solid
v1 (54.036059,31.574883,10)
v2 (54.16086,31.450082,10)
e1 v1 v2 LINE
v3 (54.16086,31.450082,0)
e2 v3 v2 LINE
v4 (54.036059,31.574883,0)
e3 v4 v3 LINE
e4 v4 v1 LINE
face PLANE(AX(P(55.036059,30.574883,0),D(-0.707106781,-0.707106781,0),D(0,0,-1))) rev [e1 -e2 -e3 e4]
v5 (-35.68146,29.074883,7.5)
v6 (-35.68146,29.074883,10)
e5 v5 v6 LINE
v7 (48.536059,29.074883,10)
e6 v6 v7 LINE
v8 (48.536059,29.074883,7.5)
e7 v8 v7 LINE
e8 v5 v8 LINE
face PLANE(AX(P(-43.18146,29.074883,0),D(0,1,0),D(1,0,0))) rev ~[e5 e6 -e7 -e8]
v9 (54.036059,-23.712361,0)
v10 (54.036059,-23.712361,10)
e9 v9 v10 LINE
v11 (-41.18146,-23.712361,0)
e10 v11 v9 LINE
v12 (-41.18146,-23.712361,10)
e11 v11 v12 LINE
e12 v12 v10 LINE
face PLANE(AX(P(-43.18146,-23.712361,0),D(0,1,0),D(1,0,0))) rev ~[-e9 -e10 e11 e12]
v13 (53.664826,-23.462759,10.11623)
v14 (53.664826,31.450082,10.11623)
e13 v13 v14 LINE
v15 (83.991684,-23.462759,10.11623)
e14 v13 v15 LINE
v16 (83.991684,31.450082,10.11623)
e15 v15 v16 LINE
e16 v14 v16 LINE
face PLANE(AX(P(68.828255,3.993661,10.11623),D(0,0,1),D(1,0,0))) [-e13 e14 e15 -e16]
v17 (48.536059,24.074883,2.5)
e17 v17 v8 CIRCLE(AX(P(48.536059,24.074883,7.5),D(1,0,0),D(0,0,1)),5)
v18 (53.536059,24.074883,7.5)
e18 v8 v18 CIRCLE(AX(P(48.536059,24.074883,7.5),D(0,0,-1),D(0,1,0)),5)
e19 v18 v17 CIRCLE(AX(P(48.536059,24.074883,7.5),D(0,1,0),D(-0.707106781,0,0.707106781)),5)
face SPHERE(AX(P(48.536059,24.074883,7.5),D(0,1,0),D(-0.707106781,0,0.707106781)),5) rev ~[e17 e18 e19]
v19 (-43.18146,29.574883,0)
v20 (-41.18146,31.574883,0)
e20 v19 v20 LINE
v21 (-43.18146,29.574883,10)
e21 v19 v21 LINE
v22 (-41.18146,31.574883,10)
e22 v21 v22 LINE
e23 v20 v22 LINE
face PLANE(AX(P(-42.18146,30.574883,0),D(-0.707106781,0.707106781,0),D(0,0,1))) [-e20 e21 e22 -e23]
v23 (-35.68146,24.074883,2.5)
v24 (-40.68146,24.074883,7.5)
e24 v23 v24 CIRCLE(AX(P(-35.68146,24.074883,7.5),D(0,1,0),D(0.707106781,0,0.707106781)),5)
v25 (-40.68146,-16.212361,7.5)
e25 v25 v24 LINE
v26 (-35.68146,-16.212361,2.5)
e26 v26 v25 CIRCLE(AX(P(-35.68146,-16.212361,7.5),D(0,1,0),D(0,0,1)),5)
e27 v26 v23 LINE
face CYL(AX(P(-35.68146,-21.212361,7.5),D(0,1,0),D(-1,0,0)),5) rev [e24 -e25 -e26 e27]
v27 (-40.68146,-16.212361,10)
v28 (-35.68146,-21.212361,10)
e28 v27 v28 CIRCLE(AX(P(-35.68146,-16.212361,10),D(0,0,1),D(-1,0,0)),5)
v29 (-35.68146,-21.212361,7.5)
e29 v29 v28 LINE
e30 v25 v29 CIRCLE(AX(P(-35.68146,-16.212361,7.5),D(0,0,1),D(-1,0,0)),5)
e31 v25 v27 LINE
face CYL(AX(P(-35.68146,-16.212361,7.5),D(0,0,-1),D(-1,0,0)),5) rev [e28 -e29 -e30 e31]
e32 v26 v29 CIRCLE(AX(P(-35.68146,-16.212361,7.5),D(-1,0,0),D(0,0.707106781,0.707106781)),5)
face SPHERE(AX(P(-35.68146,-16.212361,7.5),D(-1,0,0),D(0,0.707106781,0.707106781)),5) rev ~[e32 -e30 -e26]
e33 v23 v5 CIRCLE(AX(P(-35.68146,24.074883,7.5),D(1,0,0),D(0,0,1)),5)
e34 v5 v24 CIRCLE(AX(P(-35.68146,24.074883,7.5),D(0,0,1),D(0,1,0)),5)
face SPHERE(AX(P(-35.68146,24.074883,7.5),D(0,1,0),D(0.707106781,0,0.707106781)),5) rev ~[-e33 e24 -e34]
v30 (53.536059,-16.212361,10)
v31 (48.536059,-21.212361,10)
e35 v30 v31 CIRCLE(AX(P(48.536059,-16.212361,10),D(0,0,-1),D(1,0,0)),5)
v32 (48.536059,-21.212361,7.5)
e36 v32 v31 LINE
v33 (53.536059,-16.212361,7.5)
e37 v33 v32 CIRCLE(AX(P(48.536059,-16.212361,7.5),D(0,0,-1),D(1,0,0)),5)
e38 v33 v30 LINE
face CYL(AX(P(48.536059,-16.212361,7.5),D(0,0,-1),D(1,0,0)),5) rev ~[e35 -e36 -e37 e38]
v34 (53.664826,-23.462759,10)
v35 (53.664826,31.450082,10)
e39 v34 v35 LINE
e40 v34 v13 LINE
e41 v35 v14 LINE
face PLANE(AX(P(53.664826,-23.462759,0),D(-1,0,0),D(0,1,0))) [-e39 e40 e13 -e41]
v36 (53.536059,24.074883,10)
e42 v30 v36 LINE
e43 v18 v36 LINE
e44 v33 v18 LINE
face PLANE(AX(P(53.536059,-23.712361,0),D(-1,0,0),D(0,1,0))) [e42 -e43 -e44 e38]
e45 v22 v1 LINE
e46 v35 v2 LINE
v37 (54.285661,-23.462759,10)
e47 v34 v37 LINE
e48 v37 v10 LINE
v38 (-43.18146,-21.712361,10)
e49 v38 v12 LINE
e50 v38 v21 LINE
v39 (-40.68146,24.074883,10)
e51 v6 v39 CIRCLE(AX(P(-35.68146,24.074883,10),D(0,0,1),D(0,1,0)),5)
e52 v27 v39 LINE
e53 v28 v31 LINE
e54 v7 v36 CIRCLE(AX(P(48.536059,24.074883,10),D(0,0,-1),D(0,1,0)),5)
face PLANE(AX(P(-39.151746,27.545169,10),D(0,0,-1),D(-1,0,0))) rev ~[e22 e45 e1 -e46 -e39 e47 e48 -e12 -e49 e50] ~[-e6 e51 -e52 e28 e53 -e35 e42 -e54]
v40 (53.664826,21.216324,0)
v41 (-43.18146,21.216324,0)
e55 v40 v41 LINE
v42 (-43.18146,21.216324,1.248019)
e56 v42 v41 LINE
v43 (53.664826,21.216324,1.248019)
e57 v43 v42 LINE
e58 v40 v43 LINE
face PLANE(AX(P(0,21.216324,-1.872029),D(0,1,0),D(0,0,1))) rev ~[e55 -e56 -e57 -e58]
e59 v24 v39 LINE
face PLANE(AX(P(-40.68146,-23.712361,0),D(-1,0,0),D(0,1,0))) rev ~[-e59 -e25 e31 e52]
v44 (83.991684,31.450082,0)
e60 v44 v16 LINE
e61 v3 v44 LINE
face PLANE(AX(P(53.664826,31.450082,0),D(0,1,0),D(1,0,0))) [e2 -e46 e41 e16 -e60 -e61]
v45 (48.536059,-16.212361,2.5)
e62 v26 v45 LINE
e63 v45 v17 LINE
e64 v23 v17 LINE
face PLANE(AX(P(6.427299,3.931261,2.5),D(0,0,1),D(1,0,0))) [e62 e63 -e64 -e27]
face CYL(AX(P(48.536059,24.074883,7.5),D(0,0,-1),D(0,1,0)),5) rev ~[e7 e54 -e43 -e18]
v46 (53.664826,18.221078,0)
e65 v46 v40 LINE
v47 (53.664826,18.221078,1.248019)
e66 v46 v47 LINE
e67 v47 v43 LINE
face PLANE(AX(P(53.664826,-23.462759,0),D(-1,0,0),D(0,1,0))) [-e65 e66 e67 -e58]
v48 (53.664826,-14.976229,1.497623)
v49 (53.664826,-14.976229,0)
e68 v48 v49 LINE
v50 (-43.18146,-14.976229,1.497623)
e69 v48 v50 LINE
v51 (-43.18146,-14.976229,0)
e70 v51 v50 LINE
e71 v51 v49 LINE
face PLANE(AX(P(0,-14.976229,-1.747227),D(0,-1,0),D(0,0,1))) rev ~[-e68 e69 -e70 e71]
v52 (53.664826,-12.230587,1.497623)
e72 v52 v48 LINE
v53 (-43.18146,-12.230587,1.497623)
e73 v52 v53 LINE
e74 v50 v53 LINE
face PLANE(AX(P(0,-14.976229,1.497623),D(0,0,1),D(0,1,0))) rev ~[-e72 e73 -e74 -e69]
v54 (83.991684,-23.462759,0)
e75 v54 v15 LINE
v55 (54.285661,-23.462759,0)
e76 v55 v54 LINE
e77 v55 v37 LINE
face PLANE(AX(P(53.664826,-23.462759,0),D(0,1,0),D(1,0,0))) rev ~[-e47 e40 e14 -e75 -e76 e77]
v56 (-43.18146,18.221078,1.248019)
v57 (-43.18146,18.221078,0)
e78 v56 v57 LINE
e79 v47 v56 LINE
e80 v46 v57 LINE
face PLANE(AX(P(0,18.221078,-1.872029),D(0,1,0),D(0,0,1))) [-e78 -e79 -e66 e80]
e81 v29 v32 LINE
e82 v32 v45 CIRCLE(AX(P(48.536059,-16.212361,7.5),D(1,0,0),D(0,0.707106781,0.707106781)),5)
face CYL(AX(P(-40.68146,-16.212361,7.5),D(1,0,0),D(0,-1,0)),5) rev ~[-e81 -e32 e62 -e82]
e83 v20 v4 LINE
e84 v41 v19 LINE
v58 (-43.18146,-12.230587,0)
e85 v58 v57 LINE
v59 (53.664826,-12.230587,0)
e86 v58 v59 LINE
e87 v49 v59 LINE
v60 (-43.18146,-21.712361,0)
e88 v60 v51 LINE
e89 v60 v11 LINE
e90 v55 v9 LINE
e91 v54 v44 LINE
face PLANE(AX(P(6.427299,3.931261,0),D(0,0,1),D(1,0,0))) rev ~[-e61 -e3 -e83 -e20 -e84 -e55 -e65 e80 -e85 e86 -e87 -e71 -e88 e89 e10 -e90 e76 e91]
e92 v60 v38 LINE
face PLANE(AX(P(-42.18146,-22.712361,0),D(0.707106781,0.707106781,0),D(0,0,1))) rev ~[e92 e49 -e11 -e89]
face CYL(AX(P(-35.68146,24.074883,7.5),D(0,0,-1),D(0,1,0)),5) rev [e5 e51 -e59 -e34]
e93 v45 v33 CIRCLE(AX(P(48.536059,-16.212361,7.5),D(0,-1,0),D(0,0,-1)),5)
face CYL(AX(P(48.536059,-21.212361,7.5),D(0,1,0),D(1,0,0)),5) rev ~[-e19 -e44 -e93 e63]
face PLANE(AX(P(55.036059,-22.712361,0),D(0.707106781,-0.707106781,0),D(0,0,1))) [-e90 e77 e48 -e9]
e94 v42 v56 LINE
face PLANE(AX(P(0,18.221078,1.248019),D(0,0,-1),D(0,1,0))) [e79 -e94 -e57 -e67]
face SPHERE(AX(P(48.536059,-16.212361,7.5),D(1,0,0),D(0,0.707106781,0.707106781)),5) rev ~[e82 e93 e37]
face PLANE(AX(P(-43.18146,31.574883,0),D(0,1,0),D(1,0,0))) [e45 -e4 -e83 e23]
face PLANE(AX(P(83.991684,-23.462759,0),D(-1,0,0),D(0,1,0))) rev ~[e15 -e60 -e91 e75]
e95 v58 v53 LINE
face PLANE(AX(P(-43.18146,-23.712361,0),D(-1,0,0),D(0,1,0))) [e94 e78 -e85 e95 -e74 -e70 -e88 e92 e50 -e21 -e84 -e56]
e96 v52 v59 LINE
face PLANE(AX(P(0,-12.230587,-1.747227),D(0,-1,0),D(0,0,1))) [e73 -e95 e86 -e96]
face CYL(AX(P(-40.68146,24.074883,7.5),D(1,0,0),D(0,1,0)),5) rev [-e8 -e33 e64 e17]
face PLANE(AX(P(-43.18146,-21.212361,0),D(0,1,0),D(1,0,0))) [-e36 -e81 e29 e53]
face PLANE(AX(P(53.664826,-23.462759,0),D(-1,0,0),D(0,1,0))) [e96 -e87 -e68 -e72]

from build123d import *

# Parameters (mm, degrees)
F0_W         = 99.2175191641
F0_H         = 55.2872437984
F1_DEPTH     = 10
F2_T         = -2.5
F3_R         = 5
F4_T1_DEPTH  = 2.5
F4_S5_W      = 5
F4_S5_H      = 5
F4_T6_DEPTH  = 5
F4_S11_W     = 5
F4_S11_H     = 5
F4_T12_DEPTH = 5
F4_S17_W     = 5
F4_S17_H     = 5
F4_T18_DEPTH = 5
F4_S23_W     = 5
F4_S23_H     = 5
F4_T24_DEPTH = 5
F5_SIZE      = 2
F6_W         = 2.7456413954
F6_H         = 3.2448493876
F6_W_2       = 2.9952451587
F6_H_2       = 3.1200476224
F7_DEPTH     = 58.81103
F8_W         = 30.3268581629
F8_H         = 54.9128409475
F9_DEPTH     = 10.11623


# Not quite as in the source:
# - a fillet or chamfer that OpenCascade refuses, or shapes differently, is made with other operations: its cross-section is extruded or revolved along the edge and cut away or added
# - a feature names something its author has since deleted; it is built from what else it names


with BuildPart() as f1:
    # F0 (on Top) → F1 (new body)
    with BuildSketch(Plane.XY):
        with Locations((6.4272992313, 3.9312606677)):
            Rectangle(F0_W, F0_H)
    extrude(amount=F1_DEPTH)

    # F2
    f2_openings = [f1.faces().sort_by_distance(p)[0] for p in [
        (6.427299, 3.931261, 10),
    ]]
    offset(amount=F2_T, openings=f2_openings)

    # F3
    f3_edges = [f1.edges().sort_by_distance(p)[0] for p in [
        (6.427299, 29.074883, 2.5),
        (-40.68146, 3.931261, 2.5),
        (53.536059, 3.931261, 2.5),
        (6.427299, -21.212361, 2.5),
    ]]
    fillet(f3_edges, radius=F3_R)

    # F4: fillet of radius 5 on 4 edges, made by hand

    # F4_s2 → F4_t1 (join)
    with BuildSketch(Plane.XY.offset(7.5)):
        with BuildLine():
            ThreePointArc((-35.6814603508, 29.0748825669), (-39.2169942567, 27.6104164729), (-40.6814603508, 24.0748825669))
            Line((-40.6814603508, 24.0748825669), (-40.6814603508, 29.0748825669))
            Line((-40.6814603508, 29.0748825669), (-35.6814603508, 29.0748825669))
        make_face()
        with BuildLine():
            ThreePointArc((-40.6814603508, -16.2123612314), (-39.2169942567, -19.7478951374), (-35.6814603508, -21.2123612314))
            Line((-35.6814603508, -21.2123612314), (-40.6814603508, -21.2123612314))
            Line((-40.6814603508, -21.2123612314), (-40.6814603508, -16.2123612314))
        make_face()
        with BuildLine():
            ThreePointArc((53.5360588133, -16.2123612314), (52.0715927193, -19.7478951374), (48.5360588133, -21.2123612314))
            Line((48.5360588133, -21.2123612314), (53.5360588133, -21.2123612314))
            Line((53.5360588133, -21.2123612314), (53.5360588133, -16.2123612314))
        make_face()
        with BuildLine():
            ThreePointArc((48.5360588133, 29.0748825669), (52.0715927193, 27.6104164729), (53.5360588133, 24.0748825669))
            Line((53.5360588133, 24.0748825669), (53.5360588133, 29.0748825669))
            Line((53.5360588133, 29.0748825669), (48.5360588133, 29.0748825669))
        make_face()
    extrude(amount=F4_T1_DEPTH)


with BuildPart() as f4_tool4:
    # F4_s5 → F4_t6 (new body)
    with BuildSketch(Plane.XZ.offset(-24.0748825669)):
        with Locations((51.0360588133, 5)):
            Rectangle(F4_S5_W, F4_S5_H)
    extrude(amount=-F4_T6_DEPTH)

    # F4_s7 → F4_t8 (revolve, cut)
    with BuildSketch(Plane(origin=(48.5360588133, 24.0748825669, 7.5), x_dir=(-0.7071067812, 0, 0.7071067812), z_dir=(-0.7071067812, 0, -0.7071067812))):
        with BuildLine():
            ThreePointArc((0, -5), (5, 0), (0, 5))
            Line((0, 5), (0, -5))
        make_face()
    revolve(axis=Axis((48.5360588133, 24.0748825669, 7.5), (0, 1, 0)), mode=Mode.SUBTRACT)


with BuildPart() as f1_1:
    add(f1.part)

    # F4_t3: union F4_tool4
    add(f4_tool4.part)


with BuildPart() as f4_tool10:
    # F4_s11 → F4_t12 (new body)
    with BuildSketch(Plane.YZ.offset(48.5360588133)):
        with Locations((-18.7123612314, 5)):
            Rectangle(F4_S11_W, F4_S11_H)
    extrude(amount=F4_T12_DEPTH)

    # F4_s13 → F4_t14 (revolve, cut)
    with BuildSketch(Plane(origin=(48.5360588133, -16.2123612314, 7.5), x_dir=(0, 0.7071067812, 0.7071067812), z_dir=(0, 0.7071067812, -0.7071067812))):
        with BuildLine():
            ThreePointArc((0, -5), (5, 0), (0, 5))
            Line((0, 5), (0, -5))
        make_face()
    revolve(axis=Axis((48.5360588133, -16.2123612314, 7.5), (1, 0, 0)), mode=Mode.SUBTRACT)


with BuildPart() as f1_2:
    add(f1_1.part)

    # F4_t9: union F4_tool10
    add(f4_tool10.part)


with BuildPart() as f4_tool16:
    # F4_s17 → F4_t18 (new body)
    with BuildSketch(Plane.YZ.offset(-35.6814603508)):
        with Locations((-18.7123612314, 5)):
            Rectangle(F4_S17_W, F4_S17_H)
    extrude(amount=-F4_T18_DEPTH)

    # F4_s19 → F4_t20 (revolve, cut)
    with BuildSketch(Plane(origin=(-35.6814603508, -16.2123612314, 7.5), x_dir=(0, 0.7071067812, 0.7071067812), z_dir=(0, -0.7071067812, 0.7071067812))):
        with BuildLine():
            ThreePointArc((0, -5), (5, 0), (0, 5))
            Line((0, 5), (0, -5))
        make_face()
    revolve(axis=Axis((-35.6814603508, -16.2123612314, 7.5), (-1, 0, 0)), mode=Mode.SUBTRACT)


with BuildPart() as f1_3:
    add(f1_2.part)

    # F4_t15: union F4_tool16
    add(f4_tool16.part)


with BuildPart() as f4_tool22:
    # F4_s23 → F4_t24 (new body)
    with BuildSketch(Plane.XZ.offset(-24.0748825669)):
        with Locations((-38.1814603508, 5)):
            Rectangle(F4_S23_W, F4_S23_H)
    extrude(amount=-F4_T24_DEPTH)

    # F4_s25 → F4_t26 (revolve, cut)
    with BuildSketch(Plane(origin=(-35.6814603508, 24.0748825669, 7.5), x_dir=(0.7071067812, 0, 0.7071067812), z_dir=(-0.7071067812, 0, 0.7071067812))):
        with BuildLine():
            ThreePointArc((0, -5), (5, 0), (0, 5))
            Line((0, 5), (0, -5))
        make_face()
    revolve(axis=Axis((-35.6814603508, 24.0748825669, 7.5), (0, 1, 0)), mode=Mode.SUBTRACT)


with BuildPart() as f1_4:
    add(f1_3.part)

    # F4_t21: union F4_tool22
    add(f4_tool22.part)

    # F5
    f5_edges = [f1_4.edges().sort_by_distance(p)[0] for p in [
        (56.036059, -23.712361, 5),
        (56.036059, 31.574883, 5),
        (-43.18146, -23.712361, 5),
        (-43.18146, 31.574883, 5),
    ]]
    chamfer(f5_edges, length=F5_SIZE)

    # F6 (on Right) → F7 (cut, symmetric)
    with BuildSketch(Plane.YZ):
        with Locations((-13.6034078896, -0.1248018816)):
            Rectangle(F6_W, F6_H)
        with Locations((19.7187010199, -0.3120047622)):
            Rectangle(F6_W_2, F6_H_2)
    extrude(amount=F7_DEPTH, both=True, mode=Mode.SUBTRACT)

    # F8 (on Top) → F9 (join)
    with BuildSketch(Plane.XY):
        with Locations((68.8282549381, 3.9936611429)):
            Rectangle(F8_W, F8_H)
    extrude(amount=F9_DEPTH)


solid = f1_4.part
